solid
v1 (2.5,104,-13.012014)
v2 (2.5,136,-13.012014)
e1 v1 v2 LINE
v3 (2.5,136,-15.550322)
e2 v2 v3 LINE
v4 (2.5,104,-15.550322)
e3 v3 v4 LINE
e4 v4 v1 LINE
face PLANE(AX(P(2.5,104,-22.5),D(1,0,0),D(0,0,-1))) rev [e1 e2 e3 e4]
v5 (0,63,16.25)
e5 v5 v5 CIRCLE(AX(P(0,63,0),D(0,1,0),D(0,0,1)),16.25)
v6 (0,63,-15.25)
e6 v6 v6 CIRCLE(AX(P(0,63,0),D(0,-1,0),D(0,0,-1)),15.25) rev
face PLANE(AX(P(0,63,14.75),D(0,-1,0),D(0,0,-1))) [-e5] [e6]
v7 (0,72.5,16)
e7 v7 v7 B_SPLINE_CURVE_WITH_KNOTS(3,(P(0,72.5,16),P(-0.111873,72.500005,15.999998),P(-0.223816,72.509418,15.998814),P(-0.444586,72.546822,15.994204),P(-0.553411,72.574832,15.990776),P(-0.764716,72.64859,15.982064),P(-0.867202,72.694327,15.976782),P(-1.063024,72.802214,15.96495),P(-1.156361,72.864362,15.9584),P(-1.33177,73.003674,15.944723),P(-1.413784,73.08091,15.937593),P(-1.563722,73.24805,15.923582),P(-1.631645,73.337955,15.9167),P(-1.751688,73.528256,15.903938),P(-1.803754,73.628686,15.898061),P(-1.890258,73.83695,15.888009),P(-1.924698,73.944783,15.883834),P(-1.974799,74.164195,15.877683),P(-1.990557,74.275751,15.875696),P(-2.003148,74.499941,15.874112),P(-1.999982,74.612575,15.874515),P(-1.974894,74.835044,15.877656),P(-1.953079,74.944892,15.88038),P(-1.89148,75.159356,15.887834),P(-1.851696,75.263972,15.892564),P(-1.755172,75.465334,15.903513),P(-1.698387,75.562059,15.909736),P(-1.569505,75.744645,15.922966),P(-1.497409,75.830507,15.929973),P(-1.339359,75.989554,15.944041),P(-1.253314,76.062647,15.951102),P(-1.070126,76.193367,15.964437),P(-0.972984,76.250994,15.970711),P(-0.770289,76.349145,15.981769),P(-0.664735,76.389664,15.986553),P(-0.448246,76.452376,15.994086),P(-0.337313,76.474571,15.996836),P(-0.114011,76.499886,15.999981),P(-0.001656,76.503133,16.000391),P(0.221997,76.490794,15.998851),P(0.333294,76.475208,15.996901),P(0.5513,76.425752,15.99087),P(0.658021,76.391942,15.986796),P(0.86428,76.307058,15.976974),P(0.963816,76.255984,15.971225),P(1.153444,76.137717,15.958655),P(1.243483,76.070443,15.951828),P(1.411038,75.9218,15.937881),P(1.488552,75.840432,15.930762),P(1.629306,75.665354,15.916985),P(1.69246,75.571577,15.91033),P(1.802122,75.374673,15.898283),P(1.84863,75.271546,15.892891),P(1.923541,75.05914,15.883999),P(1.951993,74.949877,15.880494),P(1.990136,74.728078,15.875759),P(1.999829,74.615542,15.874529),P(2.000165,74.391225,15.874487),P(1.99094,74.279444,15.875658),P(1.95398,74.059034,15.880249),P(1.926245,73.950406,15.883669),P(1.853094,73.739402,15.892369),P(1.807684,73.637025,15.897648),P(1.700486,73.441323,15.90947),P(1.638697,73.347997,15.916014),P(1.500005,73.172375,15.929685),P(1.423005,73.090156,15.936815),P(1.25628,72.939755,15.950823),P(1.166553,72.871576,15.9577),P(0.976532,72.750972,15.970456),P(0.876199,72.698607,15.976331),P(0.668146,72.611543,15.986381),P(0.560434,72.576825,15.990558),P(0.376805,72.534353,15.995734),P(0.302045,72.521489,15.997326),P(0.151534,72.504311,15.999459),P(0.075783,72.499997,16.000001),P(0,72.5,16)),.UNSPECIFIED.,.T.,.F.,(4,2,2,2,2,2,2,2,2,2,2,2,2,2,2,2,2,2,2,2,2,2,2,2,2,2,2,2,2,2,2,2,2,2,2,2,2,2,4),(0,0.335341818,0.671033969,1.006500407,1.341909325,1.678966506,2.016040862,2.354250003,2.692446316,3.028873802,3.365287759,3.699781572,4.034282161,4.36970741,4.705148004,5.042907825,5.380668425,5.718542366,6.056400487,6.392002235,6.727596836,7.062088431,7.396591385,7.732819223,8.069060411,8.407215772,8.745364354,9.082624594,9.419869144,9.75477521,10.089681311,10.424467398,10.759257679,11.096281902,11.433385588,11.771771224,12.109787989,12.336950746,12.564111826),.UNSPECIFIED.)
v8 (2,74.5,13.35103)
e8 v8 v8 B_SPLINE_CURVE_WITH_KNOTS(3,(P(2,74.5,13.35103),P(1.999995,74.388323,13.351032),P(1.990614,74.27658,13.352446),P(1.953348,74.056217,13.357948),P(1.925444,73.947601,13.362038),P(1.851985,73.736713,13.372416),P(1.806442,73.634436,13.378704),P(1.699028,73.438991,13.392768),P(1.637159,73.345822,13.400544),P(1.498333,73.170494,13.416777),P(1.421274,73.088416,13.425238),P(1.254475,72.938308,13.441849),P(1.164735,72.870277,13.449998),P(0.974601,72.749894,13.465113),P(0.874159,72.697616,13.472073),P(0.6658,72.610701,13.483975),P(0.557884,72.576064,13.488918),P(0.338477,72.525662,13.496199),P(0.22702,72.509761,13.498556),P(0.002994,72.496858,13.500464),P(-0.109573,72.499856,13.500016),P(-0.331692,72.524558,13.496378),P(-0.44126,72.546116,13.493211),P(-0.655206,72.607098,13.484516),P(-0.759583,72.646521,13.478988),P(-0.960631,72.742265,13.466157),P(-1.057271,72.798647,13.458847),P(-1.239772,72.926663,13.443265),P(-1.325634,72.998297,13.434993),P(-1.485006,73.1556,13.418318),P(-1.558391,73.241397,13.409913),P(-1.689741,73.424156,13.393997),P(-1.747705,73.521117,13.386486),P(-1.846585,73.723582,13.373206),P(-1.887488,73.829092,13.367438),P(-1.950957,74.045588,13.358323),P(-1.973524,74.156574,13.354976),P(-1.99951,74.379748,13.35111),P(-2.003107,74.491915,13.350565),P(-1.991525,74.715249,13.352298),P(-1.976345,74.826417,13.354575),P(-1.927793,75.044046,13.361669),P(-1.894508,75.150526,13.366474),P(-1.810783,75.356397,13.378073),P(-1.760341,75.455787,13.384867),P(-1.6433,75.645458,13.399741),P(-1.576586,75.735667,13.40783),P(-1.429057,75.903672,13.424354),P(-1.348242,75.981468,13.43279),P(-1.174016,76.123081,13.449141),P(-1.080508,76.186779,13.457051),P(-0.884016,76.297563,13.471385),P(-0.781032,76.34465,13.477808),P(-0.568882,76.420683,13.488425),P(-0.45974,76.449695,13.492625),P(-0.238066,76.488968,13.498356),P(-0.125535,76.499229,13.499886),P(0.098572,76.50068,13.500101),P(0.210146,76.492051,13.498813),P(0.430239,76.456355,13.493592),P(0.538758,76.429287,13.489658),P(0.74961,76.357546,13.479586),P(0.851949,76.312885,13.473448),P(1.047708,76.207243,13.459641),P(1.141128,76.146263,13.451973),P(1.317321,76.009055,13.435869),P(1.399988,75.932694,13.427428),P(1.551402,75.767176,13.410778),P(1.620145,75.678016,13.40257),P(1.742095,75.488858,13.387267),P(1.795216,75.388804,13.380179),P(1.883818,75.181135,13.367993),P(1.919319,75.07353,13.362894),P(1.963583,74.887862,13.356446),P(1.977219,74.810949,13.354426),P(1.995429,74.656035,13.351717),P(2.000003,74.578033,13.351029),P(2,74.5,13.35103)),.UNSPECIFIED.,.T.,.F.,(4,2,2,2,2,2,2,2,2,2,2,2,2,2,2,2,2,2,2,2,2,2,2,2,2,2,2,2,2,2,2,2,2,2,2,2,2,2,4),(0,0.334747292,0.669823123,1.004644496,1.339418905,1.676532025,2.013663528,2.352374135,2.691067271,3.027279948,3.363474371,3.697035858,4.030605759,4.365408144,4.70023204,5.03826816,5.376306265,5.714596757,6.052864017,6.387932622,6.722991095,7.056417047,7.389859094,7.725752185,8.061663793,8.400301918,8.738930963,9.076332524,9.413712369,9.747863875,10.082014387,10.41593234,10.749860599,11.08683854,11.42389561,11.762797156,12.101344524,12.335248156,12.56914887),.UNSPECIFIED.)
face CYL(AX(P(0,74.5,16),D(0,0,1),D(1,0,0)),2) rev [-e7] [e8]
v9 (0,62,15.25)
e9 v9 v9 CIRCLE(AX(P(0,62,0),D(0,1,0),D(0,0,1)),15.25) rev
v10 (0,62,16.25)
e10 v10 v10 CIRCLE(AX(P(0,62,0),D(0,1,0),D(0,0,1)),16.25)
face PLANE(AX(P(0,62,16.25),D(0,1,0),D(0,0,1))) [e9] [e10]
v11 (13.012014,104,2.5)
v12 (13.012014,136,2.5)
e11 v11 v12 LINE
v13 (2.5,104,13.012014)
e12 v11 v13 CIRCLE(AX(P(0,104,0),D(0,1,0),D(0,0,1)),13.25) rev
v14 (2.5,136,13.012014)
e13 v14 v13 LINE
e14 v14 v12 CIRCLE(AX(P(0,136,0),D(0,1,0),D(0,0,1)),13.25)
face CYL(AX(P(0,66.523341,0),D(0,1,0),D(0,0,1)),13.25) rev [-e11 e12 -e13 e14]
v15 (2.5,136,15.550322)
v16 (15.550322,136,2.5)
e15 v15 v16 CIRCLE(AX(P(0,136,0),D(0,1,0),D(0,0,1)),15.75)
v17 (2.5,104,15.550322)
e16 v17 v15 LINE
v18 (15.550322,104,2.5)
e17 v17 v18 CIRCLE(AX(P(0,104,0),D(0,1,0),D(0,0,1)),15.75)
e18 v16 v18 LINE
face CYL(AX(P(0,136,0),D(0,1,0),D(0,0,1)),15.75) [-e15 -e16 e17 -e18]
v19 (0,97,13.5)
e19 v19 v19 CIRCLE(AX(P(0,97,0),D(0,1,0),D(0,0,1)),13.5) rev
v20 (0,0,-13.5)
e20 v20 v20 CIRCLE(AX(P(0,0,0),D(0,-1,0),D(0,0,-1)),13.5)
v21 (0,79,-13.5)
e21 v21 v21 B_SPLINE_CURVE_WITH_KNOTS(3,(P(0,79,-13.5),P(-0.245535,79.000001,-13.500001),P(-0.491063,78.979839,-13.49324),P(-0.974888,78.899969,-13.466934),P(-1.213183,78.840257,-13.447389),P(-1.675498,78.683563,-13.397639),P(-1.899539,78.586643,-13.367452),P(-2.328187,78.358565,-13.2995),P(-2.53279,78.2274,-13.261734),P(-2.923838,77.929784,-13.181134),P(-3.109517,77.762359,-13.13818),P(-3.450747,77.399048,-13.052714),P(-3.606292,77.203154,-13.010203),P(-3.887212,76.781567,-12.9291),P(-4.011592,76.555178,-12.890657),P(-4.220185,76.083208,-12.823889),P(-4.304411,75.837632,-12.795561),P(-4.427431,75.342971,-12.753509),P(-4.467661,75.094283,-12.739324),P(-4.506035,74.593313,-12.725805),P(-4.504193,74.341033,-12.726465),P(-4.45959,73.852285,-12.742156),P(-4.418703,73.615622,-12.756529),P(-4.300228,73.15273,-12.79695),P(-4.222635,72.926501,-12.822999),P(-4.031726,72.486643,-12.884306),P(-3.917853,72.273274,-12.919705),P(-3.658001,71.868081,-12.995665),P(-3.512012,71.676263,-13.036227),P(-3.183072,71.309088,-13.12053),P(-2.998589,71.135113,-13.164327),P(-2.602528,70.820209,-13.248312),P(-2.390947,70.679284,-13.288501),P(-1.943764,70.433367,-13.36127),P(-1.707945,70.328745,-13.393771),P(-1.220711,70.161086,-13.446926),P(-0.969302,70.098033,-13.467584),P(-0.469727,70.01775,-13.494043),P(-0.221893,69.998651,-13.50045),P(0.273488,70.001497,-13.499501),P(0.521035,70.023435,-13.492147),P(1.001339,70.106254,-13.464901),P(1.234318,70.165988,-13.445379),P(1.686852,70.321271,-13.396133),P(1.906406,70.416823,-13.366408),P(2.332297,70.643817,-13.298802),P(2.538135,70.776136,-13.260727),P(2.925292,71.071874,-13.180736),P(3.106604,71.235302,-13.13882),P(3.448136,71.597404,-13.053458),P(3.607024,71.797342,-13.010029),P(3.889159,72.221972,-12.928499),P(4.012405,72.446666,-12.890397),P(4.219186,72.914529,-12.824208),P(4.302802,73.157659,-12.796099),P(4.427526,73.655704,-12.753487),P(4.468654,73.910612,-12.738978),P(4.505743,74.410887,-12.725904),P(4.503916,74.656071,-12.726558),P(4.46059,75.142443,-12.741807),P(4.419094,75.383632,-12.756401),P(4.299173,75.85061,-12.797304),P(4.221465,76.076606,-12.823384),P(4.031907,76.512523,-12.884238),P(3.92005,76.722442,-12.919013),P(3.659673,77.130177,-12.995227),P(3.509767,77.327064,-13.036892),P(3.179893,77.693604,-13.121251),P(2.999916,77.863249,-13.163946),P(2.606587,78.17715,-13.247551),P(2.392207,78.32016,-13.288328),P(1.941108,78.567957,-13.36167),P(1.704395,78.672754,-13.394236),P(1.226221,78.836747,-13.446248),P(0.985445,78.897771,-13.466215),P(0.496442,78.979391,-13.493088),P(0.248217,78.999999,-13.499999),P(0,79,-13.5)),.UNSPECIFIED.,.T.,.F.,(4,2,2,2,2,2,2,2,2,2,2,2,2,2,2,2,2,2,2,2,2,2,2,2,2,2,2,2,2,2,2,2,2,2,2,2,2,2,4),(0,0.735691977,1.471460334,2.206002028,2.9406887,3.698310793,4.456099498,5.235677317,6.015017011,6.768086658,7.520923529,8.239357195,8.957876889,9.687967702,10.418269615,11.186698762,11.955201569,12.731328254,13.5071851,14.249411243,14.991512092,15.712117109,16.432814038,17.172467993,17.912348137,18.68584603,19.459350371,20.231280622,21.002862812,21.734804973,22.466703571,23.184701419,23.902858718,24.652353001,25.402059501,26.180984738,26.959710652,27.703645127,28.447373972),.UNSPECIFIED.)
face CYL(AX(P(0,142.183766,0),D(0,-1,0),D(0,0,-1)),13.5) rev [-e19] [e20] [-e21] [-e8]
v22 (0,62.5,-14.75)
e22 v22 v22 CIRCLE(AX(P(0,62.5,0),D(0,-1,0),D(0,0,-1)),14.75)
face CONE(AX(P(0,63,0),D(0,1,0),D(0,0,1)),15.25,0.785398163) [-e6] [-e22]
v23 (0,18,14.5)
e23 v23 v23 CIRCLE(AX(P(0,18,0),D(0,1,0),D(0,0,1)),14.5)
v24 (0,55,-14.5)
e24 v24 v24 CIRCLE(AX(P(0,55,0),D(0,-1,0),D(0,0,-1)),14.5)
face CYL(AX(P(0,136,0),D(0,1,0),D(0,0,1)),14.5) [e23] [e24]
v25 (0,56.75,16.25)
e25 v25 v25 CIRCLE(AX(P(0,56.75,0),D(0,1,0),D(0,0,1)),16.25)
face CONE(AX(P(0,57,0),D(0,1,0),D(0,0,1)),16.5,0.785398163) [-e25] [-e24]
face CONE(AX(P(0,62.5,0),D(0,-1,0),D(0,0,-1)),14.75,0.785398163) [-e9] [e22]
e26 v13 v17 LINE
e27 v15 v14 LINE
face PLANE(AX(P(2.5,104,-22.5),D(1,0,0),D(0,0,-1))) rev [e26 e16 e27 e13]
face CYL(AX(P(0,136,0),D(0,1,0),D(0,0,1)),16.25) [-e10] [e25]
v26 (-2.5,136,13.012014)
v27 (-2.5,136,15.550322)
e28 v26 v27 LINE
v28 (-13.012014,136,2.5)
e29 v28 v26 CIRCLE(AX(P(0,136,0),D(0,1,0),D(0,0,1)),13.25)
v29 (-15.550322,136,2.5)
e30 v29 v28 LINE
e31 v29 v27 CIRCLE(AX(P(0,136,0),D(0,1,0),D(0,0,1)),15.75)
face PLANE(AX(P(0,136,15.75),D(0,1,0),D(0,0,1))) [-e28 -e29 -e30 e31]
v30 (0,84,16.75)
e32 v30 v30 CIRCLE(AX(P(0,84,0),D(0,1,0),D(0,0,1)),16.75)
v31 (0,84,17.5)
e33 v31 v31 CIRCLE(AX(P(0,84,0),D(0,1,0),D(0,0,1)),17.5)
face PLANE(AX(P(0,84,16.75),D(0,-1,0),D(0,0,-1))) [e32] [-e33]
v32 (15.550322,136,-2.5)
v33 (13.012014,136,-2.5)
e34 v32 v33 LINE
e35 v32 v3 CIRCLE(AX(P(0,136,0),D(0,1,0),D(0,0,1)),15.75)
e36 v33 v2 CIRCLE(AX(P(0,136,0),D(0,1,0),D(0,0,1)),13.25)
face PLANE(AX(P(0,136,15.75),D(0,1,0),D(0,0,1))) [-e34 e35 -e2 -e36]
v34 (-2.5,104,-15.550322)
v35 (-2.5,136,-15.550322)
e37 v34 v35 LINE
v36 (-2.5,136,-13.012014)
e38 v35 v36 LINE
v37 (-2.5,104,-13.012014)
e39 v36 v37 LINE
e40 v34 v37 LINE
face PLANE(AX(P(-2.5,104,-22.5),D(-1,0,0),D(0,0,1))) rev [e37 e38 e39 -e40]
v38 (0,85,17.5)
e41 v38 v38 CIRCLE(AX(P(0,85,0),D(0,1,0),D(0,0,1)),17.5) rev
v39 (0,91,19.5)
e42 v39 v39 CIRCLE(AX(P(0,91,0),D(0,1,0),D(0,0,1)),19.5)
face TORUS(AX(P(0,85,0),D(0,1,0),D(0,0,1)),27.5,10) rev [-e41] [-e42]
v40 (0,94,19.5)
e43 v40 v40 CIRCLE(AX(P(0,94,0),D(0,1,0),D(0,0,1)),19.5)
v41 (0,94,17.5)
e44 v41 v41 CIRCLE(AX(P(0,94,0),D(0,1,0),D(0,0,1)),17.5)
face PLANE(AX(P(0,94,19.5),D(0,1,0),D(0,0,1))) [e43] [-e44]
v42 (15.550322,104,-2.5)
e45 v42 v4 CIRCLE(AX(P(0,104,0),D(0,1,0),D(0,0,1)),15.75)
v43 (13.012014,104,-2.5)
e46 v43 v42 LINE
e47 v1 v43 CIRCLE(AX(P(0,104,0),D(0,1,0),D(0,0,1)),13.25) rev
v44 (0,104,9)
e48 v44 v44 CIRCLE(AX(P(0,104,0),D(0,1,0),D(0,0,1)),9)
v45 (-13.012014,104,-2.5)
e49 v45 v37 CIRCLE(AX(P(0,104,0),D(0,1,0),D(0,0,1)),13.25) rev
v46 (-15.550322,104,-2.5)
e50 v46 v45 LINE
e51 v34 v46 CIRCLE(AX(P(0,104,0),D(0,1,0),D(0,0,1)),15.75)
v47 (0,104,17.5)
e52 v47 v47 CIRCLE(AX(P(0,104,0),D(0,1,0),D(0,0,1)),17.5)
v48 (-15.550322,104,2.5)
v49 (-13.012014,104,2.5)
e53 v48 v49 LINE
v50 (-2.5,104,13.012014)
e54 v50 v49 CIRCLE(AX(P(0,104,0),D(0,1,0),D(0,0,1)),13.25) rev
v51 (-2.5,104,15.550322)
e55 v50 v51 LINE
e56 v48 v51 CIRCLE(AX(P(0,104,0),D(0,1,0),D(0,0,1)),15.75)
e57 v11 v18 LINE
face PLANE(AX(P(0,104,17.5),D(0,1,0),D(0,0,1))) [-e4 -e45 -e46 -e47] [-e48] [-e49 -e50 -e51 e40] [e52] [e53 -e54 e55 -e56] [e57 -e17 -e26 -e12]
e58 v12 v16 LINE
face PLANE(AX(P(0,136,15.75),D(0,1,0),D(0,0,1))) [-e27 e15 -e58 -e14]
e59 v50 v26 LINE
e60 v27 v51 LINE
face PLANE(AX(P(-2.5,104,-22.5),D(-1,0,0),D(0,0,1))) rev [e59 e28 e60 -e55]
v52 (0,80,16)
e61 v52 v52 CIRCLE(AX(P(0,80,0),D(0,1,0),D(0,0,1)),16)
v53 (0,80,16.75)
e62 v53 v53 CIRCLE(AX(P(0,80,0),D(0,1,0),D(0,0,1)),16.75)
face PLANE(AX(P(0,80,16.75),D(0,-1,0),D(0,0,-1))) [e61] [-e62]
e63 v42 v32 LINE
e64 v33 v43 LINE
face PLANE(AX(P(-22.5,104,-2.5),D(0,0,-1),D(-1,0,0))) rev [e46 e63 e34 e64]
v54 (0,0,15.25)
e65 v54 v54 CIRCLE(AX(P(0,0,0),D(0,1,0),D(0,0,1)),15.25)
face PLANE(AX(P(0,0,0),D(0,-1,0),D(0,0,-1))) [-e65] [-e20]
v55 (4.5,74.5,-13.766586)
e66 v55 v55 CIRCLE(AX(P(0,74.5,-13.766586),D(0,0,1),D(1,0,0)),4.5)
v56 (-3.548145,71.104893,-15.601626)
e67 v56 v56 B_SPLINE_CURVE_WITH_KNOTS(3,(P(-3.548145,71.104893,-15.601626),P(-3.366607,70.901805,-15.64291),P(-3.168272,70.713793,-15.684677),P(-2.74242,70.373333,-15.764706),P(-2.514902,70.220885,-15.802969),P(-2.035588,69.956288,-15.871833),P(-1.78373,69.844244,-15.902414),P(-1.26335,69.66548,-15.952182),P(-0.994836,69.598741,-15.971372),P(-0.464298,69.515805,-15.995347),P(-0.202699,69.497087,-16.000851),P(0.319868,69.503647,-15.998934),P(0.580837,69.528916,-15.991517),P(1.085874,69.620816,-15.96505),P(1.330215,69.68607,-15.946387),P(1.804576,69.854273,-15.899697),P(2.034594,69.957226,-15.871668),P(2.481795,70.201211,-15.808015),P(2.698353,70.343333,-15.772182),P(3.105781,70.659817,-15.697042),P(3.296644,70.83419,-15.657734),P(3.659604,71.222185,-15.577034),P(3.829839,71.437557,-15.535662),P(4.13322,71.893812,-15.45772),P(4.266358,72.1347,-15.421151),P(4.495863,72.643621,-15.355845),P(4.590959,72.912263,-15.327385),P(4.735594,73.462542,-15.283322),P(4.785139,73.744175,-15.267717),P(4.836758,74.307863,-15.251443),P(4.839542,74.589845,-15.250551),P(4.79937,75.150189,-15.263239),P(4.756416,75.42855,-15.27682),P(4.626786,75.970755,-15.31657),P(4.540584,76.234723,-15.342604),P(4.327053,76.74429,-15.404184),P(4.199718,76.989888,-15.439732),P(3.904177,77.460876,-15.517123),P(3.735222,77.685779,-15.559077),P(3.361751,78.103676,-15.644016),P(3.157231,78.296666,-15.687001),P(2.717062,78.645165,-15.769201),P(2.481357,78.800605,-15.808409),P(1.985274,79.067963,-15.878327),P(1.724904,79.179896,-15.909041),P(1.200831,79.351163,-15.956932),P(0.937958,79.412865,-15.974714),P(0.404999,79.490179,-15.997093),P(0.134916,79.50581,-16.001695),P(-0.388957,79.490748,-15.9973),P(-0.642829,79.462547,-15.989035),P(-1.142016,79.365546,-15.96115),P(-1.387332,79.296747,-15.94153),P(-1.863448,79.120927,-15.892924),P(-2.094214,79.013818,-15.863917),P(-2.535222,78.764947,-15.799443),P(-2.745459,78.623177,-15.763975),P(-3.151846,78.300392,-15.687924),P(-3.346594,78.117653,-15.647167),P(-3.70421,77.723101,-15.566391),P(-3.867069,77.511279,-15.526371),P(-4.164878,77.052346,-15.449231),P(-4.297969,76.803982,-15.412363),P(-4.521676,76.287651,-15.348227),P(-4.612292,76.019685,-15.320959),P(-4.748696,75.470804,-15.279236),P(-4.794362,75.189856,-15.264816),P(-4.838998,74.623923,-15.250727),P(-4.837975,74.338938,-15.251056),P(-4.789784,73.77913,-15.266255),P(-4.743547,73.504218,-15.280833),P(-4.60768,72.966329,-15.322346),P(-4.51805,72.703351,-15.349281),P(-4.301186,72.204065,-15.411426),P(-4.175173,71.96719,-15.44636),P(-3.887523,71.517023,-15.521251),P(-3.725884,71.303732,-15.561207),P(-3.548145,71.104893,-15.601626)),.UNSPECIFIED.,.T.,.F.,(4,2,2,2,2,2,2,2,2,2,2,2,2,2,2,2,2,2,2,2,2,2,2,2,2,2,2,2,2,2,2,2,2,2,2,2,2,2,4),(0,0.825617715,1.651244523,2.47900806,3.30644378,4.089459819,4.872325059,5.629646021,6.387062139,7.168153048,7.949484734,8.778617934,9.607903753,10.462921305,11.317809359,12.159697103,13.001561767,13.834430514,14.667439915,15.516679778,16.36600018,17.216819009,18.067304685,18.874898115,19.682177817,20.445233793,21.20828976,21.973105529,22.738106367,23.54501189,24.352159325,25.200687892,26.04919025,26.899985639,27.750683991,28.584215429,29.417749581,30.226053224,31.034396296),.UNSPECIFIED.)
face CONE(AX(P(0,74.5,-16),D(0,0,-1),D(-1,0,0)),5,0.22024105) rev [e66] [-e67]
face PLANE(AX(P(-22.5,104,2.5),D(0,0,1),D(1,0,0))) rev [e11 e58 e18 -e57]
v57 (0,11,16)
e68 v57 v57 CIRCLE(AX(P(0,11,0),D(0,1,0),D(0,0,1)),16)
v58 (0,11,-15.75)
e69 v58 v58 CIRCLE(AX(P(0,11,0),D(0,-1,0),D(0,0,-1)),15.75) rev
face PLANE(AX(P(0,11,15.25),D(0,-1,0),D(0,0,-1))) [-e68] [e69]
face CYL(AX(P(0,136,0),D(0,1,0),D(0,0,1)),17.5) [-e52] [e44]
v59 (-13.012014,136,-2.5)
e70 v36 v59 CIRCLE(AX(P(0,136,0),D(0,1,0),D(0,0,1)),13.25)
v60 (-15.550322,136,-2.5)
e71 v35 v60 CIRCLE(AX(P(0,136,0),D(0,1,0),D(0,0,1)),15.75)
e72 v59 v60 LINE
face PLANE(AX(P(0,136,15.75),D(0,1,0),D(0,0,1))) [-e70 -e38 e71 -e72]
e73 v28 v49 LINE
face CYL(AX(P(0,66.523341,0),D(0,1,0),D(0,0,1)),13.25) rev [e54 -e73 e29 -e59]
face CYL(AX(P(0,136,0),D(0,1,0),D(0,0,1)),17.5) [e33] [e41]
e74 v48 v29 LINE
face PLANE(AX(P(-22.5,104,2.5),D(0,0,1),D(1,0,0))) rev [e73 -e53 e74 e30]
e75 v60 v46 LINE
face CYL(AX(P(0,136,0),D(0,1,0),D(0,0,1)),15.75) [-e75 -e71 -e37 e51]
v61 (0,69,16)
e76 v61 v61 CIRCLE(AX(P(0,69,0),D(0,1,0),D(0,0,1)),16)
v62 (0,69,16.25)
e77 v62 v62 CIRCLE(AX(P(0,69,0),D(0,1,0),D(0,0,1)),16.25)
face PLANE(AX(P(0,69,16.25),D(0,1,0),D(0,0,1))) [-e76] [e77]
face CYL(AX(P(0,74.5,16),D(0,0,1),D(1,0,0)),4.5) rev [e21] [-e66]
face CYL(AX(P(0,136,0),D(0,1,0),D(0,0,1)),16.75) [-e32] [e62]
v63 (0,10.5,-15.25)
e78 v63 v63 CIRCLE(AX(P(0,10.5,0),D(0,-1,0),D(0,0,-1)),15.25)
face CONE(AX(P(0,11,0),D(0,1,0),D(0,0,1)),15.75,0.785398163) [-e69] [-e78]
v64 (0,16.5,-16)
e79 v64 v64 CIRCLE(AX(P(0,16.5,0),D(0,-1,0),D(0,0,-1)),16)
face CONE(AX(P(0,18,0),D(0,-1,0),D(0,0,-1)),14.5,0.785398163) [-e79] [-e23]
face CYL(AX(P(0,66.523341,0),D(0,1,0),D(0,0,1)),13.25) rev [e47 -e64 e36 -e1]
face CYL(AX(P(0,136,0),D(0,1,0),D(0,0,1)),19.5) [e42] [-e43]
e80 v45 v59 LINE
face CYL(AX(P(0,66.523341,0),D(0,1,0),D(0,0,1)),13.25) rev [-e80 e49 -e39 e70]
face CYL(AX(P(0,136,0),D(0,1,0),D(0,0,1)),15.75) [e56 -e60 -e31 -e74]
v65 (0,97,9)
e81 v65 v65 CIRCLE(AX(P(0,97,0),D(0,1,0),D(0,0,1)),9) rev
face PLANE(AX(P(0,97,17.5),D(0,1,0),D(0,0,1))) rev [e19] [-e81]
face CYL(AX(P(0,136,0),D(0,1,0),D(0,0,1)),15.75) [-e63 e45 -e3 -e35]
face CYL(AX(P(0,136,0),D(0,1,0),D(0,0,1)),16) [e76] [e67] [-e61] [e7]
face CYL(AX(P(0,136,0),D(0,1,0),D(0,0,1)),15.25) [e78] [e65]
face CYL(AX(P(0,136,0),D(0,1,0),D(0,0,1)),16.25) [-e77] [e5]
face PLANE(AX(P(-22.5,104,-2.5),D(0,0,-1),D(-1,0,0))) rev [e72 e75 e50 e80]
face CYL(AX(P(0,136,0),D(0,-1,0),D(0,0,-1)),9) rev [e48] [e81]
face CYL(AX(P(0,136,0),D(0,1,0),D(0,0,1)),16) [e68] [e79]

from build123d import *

# Parameters (mm, degrees)
CROQUIS2_W            = 5
CROQUIS2_H            = 39.415776956
CORTAR_EXTRUIR1_DEPTH = 22.5
MATRIZC2_COUNT        = 3
MATRIZC2_ANGLE        = 180
CROQUIS3_R            = 13.25
CORTAR_EXTRUIR2_DEPTH = 32
REDONDEO2_R           = 10
CHAFL_N1_SIZE         = 0.5
CHAFL_N2_SIZE         = 2
CROQUIS4_R            = 9
CORTAR_EXTRUIR3_DEPTH = 139.767791652
CROQUIS4_3_R          = 13.5
CROQUIS4_3_R_2        = 9
CORTAR_EXTRUIR4_DEPTH = 97


# Some blends are built 0.0001 mm under size
with BuildPart() as part:
    # Croquis1 → Revolución1 (revolve)
    with BuildSketch(Plane(origin=(0, 0, 0), x_dir=(0, 0, -1), z_dir=(1, 0, 0))):
        Polygon((0, 0), (-15.25, 0), (-15.25, 11), (-16, 11), (-16, 16), (-14.5, 16), (-14.5, 57), (-16.25, 57), (-16.25, 62), (-14.75, 62), (-14.75, 63), (-16.25, 63), (-16.25, 69), (-16, 69), (-16, 80), (-16.75, 80), (-16.75, 84), (-17.5, 84), (-17.5, 91), (-19.5, 91), (-19.5, 94), (-17.5, 94), (-17.5, 104), (-15.75, 104), (-15.75, 136), (0, 136), align=None)
    revolve(axis=Axis((0, 136, 0), (0, -1, 0)))

    # Croquis2 → Cortar-Extruir1 (cut, symmetric)
    with BuildSketch(Plane(origin=(0, 0, 0), x_dir=(0, 0, -1), z_dir=(1, 0, 0))):
        with Locations((0, 123.707888478)):
            Rectangle(CROQUIS2_W, CROQUIS2_H)
    cortar_extruir1 = extrude(amount=CORTAR_EXTRUIR1_DEPTH, both=True, mode=Mode.SUBTRACT)

    # MatrizC2: Cortar-Extruir1 ×3 about axis
    matrizc2_axis = Axis((0, 136, 0), (0, 1, 0))
    for i in range(1, MATRIZC2_COUNT):
        add(cortar_extruir1.rotate(matrizc2_axis, i * MATRIZC2_ANGLE / (MATRIZC2_COUNT - 1)), mode=Mode.SUBTRACT)

    # Croquis3 → Cortar-Extruir2 (cut)
    with BuildSketch(Plane(origin=(0, 136, 0), x_dir=(1, 0, 0), z_dir=(0, 1, 0))):
        Circle(CROQUIS3_R)
    extrude(amount=-CORTAR_EXTRUIR2_DEPTH, mode=Mode.SUBTRACT)

    # Redondeo2
    # the kernel refuses this fillet: 10 mm, written as the material it adds along each edge
    with BuildSketch(Plane(origin=(0, 91, 0), x_dir=(0, 0, 1), z_dir=(1, 0, 0))) as redondeo2_piece_1:
        with BuildLine():
            CenterArc((27.5, 6), REDONDEO2_R, 180, 36.869897646)
            Line((19.5, 0), (17.5, 0))
            Line((17.5, 0), (17.5, 6))
        make_face()
    revolve(axis=Axis((0, 91, 0), (0, -1, 0)))

    # Chaflán1
    chafl_n1_edges = [part.edges().sort_by_distance(p)[0] for p in [
        (0, 63, -14.75),
        (0, 62, -14.75),
        (0, 11, -15.25),
    ]]
    chamfer(chafl_n1_edges, length=CHAFL_N1_SIZE - 0.0001)  # a hair under: the kernel refuses the full size

    # Chaflán2
    # the kernel refuses this chamfer: 2 mm, written as the material it adds along each edge
    with BuildSketch(Plane(origin=(0, 16, 0), x_dir=(0, 0, 1), z_dir=(1, 0, 0))) as chafl_n2_piece_1_section:
        Polygon((14.5, -CHAFL_N2_SIZE), (14.5 + CHAFL_N2_SIZE, 0), (14.5, 0), align=None)
    chafl_n2_piece_1 = revolve(axis=Axis((0, 16, 0), (0, -1, 0)), mode=Mode.PRIVATE)
    chafl_n2_piece_1 = chafl_n2_piece_1 & Plane(origin=(0, 16, 0), x_dir=(0, 0, 1), z_dir=(0, 1, 0)) * Cylinder(16, 66, mode=Mode.PRIVATE)
    add(chafl_n2_piece_1)
    with BuildSketch(Plane(origin=(0, 57, 0), x_dir=(0, 0, 1), z_dir=(1, 0, 0))) as chafl_n2_piece_2_section:
        Polygon((14.5 + CHAFL_N2_SIZE, 0), (14.5, CHAFL_N2_SIZE), (14.5, 0), align=None)
    chafl_n2_piece_2 = revolve(axis=Axis((0, 57, 0), (0, -1, 0)), mode=Mode.PRIVATE)
    chafl_n2_piece_2 = chafl_n2_piece_2 & Plane(origin=(0, 57, 0), x_dir=(0, 0, 1), z_dir=(0, 1, 0)) * Cylinder(16.25, 66, mode=Mode.PRIVATE)
    add(chafl_n2_piece_2)

    # Croquis4 → Cortar-Extruir3 (cut, through all)
    with BuildSketch(Plane.XZ):
        with Locations(Location((0, 0, 0), (0, 0, 270))):
            Circle(CROQUIS4_R)
    extrude(amount=-CORTAR_EXTRUIR3_DEPTH, mode=Mode.SUBTRACT)

    # Croquis4<3> → Cortar-Extruir4 (cut)
    with BuildSketch(Plane.XZ):
        with Locations(Location((0, 0, 0), (0, 0, 270))):
            Circle(CROQUIS4_3_R)
        with Locations(Location((0, 0, 0), (0, 0, 90))):
            Circle(CROQUIS4_3_R_2, mode=Mode.SUBTRACT)
    extrude(amount=-CORTAR_EXTRUIR4_DEPTH, mode=Mode.SUBTRACT)

    # Croquis6 → Cortar-Revolución1 (revolve, cut)
    with BuildSketch(Plane(origin=(0, 0, 0), x_dir=(0, 0, -1), z_dir=(1, 0, 0)), mode=Mode.PRIVATE) as cortar_revoluci_n1_sk:
        Polygon((16, 79.5), (13.766586279, 79), (3.766586279, 79), (3.766586279, 76.5), (-16, 76.5), (-16, 74.5), (16, 74.5), align=None)
    revolve(cortar_revoluci_n1_sk.sketch.rotate(Axis((0, 74.5, 16), (0, 0, -1)), 90), axis=Axis((0, 74.5, 16), (0, 0, -1)), mode=Mode.SUBTRACT)


solid = part.part
